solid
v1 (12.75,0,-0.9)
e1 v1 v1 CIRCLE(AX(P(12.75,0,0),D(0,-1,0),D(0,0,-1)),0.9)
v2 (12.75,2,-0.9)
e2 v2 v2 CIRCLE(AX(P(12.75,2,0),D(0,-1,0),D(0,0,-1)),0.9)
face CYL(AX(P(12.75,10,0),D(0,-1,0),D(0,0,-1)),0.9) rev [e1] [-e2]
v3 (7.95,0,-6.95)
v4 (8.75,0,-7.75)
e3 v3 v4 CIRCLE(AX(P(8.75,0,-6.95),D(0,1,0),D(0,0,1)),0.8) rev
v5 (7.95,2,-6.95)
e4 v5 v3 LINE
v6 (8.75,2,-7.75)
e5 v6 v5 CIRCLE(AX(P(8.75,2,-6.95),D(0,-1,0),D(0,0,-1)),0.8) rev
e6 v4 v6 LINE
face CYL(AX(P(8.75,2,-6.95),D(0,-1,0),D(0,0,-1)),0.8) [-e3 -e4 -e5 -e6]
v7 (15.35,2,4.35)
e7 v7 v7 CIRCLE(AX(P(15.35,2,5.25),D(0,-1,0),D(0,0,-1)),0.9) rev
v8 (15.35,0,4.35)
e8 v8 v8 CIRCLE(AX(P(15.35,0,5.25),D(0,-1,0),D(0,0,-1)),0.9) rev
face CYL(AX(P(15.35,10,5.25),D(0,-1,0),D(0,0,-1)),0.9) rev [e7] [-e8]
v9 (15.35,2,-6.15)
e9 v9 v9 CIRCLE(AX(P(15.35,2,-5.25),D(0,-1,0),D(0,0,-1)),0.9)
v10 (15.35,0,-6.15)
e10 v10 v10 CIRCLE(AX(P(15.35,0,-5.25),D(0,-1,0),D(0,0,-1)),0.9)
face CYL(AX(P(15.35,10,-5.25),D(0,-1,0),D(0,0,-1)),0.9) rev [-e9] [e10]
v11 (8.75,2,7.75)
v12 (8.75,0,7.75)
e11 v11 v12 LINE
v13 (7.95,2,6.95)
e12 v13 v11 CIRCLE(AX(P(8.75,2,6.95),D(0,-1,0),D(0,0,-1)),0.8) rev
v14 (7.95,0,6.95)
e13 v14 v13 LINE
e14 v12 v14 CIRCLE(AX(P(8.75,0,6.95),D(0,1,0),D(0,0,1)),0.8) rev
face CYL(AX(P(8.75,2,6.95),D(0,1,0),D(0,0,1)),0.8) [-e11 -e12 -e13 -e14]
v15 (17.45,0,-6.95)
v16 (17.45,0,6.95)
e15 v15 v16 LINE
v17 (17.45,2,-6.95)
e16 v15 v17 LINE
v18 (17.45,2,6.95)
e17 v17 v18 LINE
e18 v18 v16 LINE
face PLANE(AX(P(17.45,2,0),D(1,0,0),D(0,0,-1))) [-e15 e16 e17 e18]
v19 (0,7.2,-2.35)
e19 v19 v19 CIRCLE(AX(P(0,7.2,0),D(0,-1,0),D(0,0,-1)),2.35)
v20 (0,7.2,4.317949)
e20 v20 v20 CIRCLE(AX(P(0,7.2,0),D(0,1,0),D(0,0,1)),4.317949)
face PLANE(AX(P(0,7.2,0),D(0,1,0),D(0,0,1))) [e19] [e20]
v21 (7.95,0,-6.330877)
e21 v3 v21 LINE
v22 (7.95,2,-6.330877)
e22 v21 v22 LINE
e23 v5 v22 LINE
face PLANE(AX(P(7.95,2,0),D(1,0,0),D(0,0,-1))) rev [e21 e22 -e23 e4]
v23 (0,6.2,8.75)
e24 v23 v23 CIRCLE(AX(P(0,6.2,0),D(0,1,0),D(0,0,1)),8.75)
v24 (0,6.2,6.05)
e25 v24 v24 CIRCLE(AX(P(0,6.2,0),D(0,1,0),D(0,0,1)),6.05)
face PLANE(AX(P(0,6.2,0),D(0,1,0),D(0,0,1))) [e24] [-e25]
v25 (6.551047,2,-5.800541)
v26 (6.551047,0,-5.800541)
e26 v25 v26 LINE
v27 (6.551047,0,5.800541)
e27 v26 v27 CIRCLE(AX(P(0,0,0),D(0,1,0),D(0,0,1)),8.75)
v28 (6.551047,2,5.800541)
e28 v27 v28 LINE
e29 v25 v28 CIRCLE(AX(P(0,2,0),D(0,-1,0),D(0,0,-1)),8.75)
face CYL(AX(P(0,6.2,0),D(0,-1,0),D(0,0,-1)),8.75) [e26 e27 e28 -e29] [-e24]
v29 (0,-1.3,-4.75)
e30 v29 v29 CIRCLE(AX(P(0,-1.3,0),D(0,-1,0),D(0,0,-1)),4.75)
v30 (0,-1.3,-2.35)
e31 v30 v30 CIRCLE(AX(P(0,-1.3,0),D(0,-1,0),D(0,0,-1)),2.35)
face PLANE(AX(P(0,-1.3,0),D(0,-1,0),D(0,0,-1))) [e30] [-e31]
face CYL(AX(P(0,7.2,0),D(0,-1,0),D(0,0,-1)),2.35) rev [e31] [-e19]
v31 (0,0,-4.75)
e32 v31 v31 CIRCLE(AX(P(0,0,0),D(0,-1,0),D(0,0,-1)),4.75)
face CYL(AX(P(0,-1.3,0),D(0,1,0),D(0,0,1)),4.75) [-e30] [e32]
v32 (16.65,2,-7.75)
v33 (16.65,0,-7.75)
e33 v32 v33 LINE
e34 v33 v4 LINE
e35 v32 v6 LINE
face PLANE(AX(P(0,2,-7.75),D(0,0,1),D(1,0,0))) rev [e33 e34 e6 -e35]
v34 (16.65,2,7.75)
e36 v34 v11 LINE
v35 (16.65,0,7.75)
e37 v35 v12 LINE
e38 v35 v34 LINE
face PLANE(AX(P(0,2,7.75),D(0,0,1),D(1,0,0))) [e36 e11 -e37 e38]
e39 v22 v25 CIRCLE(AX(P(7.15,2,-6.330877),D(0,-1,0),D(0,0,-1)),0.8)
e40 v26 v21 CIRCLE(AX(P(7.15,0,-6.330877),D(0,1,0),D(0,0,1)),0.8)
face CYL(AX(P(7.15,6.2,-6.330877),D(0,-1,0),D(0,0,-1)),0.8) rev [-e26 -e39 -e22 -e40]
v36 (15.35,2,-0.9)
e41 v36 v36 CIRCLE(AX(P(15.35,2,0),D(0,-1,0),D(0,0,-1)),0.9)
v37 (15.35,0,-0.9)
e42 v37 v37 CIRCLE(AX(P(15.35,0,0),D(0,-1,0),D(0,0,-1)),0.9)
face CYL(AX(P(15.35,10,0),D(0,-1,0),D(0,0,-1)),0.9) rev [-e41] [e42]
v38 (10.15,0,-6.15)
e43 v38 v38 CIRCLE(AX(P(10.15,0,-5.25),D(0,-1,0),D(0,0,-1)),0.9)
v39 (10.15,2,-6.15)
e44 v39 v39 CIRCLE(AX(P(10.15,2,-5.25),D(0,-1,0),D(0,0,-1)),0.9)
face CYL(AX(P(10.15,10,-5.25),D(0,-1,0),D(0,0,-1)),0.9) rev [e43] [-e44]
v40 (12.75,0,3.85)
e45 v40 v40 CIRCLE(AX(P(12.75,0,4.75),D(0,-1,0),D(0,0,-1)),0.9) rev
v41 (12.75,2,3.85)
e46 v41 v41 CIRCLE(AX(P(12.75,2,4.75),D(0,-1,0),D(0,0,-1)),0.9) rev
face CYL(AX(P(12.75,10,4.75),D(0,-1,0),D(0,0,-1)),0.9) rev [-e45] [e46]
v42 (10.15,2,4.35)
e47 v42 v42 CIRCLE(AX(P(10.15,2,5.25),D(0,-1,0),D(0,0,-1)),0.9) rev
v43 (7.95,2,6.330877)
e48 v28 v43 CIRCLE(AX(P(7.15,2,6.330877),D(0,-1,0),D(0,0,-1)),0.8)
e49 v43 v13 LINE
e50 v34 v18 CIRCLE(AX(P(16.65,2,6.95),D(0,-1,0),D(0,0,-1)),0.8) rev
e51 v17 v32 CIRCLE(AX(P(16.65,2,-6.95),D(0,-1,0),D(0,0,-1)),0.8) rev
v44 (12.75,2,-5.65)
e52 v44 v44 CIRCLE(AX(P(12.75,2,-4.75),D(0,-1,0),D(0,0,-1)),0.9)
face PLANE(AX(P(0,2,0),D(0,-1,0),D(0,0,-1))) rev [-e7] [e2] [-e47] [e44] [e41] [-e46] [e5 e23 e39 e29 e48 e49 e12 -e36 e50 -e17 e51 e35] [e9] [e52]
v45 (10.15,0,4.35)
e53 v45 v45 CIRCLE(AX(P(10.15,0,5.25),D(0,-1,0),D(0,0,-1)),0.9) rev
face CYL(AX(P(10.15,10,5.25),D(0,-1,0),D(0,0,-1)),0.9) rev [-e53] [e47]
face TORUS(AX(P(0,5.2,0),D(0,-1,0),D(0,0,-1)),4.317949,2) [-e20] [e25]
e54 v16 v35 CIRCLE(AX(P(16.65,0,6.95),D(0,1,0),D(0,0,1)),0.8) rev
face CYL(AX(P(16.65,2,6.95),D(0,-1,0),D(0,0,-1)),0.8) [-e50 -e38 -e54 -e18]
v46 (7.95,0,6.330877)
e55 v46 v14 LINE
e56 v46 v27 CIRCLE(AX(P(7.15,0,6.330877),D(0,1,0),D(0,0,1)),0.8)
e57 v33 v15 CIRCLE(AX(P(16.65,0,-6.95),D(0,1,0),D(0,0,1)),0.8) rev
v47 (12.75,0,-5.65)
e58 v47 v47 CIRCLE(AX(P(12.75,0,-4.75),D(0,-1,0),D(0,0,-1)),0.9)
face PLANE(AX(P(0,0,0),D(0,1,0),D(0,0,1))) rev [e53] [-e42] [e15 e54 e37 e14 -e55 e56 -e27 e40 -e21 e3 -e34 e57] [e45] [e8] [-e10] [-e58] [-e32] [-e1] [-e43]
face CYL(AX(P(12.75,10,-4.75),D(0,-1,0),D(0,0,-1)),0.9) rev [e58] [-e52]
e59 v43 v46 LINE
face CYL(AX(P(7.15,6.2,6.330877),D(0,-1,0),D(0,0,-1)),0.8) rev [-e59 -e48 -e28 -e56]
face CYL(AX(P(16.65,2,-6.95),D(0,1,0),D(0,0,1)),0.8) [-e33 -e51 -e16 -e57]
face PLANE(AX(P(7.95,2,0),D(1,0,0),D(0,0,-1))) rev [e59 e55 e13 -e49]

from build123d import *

# Parameters (mm, degrees)
SKETCH1_R           = 8.75
BOSS_EXTRUDE1_DEPTH = 6.2
BOSS_EXTRUDE2_DEPTH = 2
FILLET1_R           = 0.8
SKETCH3_R           = 4.75
BOSS_EXTRUDE3_DEPTH = 1.3
SKETCH6_R           = 6.05
BOSS_EXTRUDE5_DEPTH = 1
SKETCH4_R           = 2.35
CUT_EXTRUDE2_DEPTH  = 22.291195363
FILLET2_R           = 2
SKETCH7_R           = 0.9
CUT_EXTRUDE4_DEPTH  = 10


with BuildPart() as part:
    # Sketch1 → Boss-Extrude1 (new body)
    with BuildSketch(Plane(origin=(0, 0, 0), x_dir=(1, 0, 0), z_dir=(0, 1, 0))):
        with Locations(Location((0, 0, 0), (0, 0, 90))):
            Circle(SKETCH1_R)
    extrude(amount=BOSS_EXTRUDE1_DEPTH)

    # Sketch2 → Boss-Extrude2 (add)
    with BuildSketch(Plane.XZ):
        with BuildLine():
            ThreePointArc((7.95, 3.655133376), (8.547660499, 1.870828693), (8.75, 0))
            Line((8.75, 0), (17.45, 0))
            Line((17.45, 0), (17.45, 7.75))
            Line((17.45, 7.75), (7.95, 7.75))
            Line((7.95, 7.75), (7.95, 3.655133376))
        make_face()
        with BuildLine():
            Line((17.45, 0), (8.75, 0))
            ThreePointArc((8.75, 0), (8.547660499, -1.870828693), (7.95, -3.655133376))
            Line((7.95, -3.655133376), (7.95, -7.75))
            Line((7.95, -7.75), (17.45, -7.75))
            Line((17.45, -7.75), (17.45, 0))
        make_face()
    extrude(amount=-BOSS_EXTRUDE2_DEPTH)

    # Fillet1
    fillet1_edges = [part.edges().sort_by_distance(p)[0] for p in [
        (7.95, 1, 3.655133376),
        (7.95, 1, 7.75),
        (17.45, 1, 7.75),
        (17.45, 1, -7.75),
        (7.95, 1, -7.75),
        (7.95, 1, -3.655133376),
    ]]
    fillet(fillet1_edges, radius=FILLET1_R)

    # Sketch3 → Boss-Extrude3 (add)
    with BuildSketch(Plane.XZ):
        with Locations(Location((0, 0, 0), (0, 0, 270))):
            Circle(SKETCH3_R)
    extrude(amount=BOSS_EXTRUDE3_DEPTH)

    # Sketch6 → Boss-Extrude5 (add)
    with BuildSketch(Plane(origin=(0, 6.2, 0), x_dir=(1, 0, 0), z_dir=(0, 1, 0))):
        with Locations(Location((0, 0, 0), (0, 0, 270))):
            Circle(SKETCH6_R)
    extrude(amount=BOSS_EXTRUDE5_DEPTH)

    # Sketch4 → Cut-Extrude2 (cut, through all)
    with BuildSketch(Plane.XZ.offset(1.3)):
        with Locations(Location((0, 0, 0), (0, 0, 270))):
            Circle(SKETCH4_R)
    extrude(amount=-CUT_EXTRUDE2_DEPTH, mode=Mode.SUBTRACT)

    # Fillet2
    # the kernel refuses this fillet: 2 mm, written as the material it takes off along each edge
    with BuildSketch(Plane(origin=(0, 7.2, 0), x_dir=(0, 0, 1), z_dir=(-1, 0, 0))) as fillet2_piece_1:
        with BuildLine():
            CenterArc((4.317949192, -2), FILLET2_R, 30, 60)
            Line((4.317949192, 0), (4.317949192, 0.04))
            Line((4.317949192, 0.04), (6.05, 0.04))
            Line((6.05, 0.04), (6.09, 0))
            ThreePointArc((6.09, 0), (6.09, -0.5), (6.084641016, -0.98))
            Line((6.084641016, -0.98), (6.05, -1))
        make_face()
    revolve(axis=Axis((0, 7.2, 0), (0, 1, 0)), mode=Mode.SUBTRACT)

    # Sketch7 → Cut-Extrude4 (cut)
    with BuildSketch(Plane.XZ):
        with Locations(Location((15.35, -5.25, 0), (0, 0, 270))):
            Circle(SKETCH7_R)
        with Locations(Location((10.15, -5.25, 0), (0, 0, 270))):
            Circle(SKETCH7_R)
        with Locations(Location((12.75, 4.75, 0), (0, 0, 270))):
            Circle(SKETCH7_R)
        with Locations(Location((12.75, 0, 0), (0, 0, 270))):
            Circle(SKETCH7_R)
        with Locations(Location((12.75, -4.75, 0), (0, 0, 270))):
            Circle(SKETCH7_R)
        with Locations(Location((15.35, 5.25, 0), (0, 0, 270))):
            Circle(SKETCH7_R)
        with Locations(Location((15.35, 0, 0), (0, 0, 270))):
            Circle(SKETCH7_R)
        with Locations(Location((10.15, 5.25, 0), (0, 0, 270))):
            Circle(SKETCH7_R)
    extrude(amount=-CUT_EXTRUDE4_DEPTH, mode=Mode.SUBTRACT)


solid = part.part
